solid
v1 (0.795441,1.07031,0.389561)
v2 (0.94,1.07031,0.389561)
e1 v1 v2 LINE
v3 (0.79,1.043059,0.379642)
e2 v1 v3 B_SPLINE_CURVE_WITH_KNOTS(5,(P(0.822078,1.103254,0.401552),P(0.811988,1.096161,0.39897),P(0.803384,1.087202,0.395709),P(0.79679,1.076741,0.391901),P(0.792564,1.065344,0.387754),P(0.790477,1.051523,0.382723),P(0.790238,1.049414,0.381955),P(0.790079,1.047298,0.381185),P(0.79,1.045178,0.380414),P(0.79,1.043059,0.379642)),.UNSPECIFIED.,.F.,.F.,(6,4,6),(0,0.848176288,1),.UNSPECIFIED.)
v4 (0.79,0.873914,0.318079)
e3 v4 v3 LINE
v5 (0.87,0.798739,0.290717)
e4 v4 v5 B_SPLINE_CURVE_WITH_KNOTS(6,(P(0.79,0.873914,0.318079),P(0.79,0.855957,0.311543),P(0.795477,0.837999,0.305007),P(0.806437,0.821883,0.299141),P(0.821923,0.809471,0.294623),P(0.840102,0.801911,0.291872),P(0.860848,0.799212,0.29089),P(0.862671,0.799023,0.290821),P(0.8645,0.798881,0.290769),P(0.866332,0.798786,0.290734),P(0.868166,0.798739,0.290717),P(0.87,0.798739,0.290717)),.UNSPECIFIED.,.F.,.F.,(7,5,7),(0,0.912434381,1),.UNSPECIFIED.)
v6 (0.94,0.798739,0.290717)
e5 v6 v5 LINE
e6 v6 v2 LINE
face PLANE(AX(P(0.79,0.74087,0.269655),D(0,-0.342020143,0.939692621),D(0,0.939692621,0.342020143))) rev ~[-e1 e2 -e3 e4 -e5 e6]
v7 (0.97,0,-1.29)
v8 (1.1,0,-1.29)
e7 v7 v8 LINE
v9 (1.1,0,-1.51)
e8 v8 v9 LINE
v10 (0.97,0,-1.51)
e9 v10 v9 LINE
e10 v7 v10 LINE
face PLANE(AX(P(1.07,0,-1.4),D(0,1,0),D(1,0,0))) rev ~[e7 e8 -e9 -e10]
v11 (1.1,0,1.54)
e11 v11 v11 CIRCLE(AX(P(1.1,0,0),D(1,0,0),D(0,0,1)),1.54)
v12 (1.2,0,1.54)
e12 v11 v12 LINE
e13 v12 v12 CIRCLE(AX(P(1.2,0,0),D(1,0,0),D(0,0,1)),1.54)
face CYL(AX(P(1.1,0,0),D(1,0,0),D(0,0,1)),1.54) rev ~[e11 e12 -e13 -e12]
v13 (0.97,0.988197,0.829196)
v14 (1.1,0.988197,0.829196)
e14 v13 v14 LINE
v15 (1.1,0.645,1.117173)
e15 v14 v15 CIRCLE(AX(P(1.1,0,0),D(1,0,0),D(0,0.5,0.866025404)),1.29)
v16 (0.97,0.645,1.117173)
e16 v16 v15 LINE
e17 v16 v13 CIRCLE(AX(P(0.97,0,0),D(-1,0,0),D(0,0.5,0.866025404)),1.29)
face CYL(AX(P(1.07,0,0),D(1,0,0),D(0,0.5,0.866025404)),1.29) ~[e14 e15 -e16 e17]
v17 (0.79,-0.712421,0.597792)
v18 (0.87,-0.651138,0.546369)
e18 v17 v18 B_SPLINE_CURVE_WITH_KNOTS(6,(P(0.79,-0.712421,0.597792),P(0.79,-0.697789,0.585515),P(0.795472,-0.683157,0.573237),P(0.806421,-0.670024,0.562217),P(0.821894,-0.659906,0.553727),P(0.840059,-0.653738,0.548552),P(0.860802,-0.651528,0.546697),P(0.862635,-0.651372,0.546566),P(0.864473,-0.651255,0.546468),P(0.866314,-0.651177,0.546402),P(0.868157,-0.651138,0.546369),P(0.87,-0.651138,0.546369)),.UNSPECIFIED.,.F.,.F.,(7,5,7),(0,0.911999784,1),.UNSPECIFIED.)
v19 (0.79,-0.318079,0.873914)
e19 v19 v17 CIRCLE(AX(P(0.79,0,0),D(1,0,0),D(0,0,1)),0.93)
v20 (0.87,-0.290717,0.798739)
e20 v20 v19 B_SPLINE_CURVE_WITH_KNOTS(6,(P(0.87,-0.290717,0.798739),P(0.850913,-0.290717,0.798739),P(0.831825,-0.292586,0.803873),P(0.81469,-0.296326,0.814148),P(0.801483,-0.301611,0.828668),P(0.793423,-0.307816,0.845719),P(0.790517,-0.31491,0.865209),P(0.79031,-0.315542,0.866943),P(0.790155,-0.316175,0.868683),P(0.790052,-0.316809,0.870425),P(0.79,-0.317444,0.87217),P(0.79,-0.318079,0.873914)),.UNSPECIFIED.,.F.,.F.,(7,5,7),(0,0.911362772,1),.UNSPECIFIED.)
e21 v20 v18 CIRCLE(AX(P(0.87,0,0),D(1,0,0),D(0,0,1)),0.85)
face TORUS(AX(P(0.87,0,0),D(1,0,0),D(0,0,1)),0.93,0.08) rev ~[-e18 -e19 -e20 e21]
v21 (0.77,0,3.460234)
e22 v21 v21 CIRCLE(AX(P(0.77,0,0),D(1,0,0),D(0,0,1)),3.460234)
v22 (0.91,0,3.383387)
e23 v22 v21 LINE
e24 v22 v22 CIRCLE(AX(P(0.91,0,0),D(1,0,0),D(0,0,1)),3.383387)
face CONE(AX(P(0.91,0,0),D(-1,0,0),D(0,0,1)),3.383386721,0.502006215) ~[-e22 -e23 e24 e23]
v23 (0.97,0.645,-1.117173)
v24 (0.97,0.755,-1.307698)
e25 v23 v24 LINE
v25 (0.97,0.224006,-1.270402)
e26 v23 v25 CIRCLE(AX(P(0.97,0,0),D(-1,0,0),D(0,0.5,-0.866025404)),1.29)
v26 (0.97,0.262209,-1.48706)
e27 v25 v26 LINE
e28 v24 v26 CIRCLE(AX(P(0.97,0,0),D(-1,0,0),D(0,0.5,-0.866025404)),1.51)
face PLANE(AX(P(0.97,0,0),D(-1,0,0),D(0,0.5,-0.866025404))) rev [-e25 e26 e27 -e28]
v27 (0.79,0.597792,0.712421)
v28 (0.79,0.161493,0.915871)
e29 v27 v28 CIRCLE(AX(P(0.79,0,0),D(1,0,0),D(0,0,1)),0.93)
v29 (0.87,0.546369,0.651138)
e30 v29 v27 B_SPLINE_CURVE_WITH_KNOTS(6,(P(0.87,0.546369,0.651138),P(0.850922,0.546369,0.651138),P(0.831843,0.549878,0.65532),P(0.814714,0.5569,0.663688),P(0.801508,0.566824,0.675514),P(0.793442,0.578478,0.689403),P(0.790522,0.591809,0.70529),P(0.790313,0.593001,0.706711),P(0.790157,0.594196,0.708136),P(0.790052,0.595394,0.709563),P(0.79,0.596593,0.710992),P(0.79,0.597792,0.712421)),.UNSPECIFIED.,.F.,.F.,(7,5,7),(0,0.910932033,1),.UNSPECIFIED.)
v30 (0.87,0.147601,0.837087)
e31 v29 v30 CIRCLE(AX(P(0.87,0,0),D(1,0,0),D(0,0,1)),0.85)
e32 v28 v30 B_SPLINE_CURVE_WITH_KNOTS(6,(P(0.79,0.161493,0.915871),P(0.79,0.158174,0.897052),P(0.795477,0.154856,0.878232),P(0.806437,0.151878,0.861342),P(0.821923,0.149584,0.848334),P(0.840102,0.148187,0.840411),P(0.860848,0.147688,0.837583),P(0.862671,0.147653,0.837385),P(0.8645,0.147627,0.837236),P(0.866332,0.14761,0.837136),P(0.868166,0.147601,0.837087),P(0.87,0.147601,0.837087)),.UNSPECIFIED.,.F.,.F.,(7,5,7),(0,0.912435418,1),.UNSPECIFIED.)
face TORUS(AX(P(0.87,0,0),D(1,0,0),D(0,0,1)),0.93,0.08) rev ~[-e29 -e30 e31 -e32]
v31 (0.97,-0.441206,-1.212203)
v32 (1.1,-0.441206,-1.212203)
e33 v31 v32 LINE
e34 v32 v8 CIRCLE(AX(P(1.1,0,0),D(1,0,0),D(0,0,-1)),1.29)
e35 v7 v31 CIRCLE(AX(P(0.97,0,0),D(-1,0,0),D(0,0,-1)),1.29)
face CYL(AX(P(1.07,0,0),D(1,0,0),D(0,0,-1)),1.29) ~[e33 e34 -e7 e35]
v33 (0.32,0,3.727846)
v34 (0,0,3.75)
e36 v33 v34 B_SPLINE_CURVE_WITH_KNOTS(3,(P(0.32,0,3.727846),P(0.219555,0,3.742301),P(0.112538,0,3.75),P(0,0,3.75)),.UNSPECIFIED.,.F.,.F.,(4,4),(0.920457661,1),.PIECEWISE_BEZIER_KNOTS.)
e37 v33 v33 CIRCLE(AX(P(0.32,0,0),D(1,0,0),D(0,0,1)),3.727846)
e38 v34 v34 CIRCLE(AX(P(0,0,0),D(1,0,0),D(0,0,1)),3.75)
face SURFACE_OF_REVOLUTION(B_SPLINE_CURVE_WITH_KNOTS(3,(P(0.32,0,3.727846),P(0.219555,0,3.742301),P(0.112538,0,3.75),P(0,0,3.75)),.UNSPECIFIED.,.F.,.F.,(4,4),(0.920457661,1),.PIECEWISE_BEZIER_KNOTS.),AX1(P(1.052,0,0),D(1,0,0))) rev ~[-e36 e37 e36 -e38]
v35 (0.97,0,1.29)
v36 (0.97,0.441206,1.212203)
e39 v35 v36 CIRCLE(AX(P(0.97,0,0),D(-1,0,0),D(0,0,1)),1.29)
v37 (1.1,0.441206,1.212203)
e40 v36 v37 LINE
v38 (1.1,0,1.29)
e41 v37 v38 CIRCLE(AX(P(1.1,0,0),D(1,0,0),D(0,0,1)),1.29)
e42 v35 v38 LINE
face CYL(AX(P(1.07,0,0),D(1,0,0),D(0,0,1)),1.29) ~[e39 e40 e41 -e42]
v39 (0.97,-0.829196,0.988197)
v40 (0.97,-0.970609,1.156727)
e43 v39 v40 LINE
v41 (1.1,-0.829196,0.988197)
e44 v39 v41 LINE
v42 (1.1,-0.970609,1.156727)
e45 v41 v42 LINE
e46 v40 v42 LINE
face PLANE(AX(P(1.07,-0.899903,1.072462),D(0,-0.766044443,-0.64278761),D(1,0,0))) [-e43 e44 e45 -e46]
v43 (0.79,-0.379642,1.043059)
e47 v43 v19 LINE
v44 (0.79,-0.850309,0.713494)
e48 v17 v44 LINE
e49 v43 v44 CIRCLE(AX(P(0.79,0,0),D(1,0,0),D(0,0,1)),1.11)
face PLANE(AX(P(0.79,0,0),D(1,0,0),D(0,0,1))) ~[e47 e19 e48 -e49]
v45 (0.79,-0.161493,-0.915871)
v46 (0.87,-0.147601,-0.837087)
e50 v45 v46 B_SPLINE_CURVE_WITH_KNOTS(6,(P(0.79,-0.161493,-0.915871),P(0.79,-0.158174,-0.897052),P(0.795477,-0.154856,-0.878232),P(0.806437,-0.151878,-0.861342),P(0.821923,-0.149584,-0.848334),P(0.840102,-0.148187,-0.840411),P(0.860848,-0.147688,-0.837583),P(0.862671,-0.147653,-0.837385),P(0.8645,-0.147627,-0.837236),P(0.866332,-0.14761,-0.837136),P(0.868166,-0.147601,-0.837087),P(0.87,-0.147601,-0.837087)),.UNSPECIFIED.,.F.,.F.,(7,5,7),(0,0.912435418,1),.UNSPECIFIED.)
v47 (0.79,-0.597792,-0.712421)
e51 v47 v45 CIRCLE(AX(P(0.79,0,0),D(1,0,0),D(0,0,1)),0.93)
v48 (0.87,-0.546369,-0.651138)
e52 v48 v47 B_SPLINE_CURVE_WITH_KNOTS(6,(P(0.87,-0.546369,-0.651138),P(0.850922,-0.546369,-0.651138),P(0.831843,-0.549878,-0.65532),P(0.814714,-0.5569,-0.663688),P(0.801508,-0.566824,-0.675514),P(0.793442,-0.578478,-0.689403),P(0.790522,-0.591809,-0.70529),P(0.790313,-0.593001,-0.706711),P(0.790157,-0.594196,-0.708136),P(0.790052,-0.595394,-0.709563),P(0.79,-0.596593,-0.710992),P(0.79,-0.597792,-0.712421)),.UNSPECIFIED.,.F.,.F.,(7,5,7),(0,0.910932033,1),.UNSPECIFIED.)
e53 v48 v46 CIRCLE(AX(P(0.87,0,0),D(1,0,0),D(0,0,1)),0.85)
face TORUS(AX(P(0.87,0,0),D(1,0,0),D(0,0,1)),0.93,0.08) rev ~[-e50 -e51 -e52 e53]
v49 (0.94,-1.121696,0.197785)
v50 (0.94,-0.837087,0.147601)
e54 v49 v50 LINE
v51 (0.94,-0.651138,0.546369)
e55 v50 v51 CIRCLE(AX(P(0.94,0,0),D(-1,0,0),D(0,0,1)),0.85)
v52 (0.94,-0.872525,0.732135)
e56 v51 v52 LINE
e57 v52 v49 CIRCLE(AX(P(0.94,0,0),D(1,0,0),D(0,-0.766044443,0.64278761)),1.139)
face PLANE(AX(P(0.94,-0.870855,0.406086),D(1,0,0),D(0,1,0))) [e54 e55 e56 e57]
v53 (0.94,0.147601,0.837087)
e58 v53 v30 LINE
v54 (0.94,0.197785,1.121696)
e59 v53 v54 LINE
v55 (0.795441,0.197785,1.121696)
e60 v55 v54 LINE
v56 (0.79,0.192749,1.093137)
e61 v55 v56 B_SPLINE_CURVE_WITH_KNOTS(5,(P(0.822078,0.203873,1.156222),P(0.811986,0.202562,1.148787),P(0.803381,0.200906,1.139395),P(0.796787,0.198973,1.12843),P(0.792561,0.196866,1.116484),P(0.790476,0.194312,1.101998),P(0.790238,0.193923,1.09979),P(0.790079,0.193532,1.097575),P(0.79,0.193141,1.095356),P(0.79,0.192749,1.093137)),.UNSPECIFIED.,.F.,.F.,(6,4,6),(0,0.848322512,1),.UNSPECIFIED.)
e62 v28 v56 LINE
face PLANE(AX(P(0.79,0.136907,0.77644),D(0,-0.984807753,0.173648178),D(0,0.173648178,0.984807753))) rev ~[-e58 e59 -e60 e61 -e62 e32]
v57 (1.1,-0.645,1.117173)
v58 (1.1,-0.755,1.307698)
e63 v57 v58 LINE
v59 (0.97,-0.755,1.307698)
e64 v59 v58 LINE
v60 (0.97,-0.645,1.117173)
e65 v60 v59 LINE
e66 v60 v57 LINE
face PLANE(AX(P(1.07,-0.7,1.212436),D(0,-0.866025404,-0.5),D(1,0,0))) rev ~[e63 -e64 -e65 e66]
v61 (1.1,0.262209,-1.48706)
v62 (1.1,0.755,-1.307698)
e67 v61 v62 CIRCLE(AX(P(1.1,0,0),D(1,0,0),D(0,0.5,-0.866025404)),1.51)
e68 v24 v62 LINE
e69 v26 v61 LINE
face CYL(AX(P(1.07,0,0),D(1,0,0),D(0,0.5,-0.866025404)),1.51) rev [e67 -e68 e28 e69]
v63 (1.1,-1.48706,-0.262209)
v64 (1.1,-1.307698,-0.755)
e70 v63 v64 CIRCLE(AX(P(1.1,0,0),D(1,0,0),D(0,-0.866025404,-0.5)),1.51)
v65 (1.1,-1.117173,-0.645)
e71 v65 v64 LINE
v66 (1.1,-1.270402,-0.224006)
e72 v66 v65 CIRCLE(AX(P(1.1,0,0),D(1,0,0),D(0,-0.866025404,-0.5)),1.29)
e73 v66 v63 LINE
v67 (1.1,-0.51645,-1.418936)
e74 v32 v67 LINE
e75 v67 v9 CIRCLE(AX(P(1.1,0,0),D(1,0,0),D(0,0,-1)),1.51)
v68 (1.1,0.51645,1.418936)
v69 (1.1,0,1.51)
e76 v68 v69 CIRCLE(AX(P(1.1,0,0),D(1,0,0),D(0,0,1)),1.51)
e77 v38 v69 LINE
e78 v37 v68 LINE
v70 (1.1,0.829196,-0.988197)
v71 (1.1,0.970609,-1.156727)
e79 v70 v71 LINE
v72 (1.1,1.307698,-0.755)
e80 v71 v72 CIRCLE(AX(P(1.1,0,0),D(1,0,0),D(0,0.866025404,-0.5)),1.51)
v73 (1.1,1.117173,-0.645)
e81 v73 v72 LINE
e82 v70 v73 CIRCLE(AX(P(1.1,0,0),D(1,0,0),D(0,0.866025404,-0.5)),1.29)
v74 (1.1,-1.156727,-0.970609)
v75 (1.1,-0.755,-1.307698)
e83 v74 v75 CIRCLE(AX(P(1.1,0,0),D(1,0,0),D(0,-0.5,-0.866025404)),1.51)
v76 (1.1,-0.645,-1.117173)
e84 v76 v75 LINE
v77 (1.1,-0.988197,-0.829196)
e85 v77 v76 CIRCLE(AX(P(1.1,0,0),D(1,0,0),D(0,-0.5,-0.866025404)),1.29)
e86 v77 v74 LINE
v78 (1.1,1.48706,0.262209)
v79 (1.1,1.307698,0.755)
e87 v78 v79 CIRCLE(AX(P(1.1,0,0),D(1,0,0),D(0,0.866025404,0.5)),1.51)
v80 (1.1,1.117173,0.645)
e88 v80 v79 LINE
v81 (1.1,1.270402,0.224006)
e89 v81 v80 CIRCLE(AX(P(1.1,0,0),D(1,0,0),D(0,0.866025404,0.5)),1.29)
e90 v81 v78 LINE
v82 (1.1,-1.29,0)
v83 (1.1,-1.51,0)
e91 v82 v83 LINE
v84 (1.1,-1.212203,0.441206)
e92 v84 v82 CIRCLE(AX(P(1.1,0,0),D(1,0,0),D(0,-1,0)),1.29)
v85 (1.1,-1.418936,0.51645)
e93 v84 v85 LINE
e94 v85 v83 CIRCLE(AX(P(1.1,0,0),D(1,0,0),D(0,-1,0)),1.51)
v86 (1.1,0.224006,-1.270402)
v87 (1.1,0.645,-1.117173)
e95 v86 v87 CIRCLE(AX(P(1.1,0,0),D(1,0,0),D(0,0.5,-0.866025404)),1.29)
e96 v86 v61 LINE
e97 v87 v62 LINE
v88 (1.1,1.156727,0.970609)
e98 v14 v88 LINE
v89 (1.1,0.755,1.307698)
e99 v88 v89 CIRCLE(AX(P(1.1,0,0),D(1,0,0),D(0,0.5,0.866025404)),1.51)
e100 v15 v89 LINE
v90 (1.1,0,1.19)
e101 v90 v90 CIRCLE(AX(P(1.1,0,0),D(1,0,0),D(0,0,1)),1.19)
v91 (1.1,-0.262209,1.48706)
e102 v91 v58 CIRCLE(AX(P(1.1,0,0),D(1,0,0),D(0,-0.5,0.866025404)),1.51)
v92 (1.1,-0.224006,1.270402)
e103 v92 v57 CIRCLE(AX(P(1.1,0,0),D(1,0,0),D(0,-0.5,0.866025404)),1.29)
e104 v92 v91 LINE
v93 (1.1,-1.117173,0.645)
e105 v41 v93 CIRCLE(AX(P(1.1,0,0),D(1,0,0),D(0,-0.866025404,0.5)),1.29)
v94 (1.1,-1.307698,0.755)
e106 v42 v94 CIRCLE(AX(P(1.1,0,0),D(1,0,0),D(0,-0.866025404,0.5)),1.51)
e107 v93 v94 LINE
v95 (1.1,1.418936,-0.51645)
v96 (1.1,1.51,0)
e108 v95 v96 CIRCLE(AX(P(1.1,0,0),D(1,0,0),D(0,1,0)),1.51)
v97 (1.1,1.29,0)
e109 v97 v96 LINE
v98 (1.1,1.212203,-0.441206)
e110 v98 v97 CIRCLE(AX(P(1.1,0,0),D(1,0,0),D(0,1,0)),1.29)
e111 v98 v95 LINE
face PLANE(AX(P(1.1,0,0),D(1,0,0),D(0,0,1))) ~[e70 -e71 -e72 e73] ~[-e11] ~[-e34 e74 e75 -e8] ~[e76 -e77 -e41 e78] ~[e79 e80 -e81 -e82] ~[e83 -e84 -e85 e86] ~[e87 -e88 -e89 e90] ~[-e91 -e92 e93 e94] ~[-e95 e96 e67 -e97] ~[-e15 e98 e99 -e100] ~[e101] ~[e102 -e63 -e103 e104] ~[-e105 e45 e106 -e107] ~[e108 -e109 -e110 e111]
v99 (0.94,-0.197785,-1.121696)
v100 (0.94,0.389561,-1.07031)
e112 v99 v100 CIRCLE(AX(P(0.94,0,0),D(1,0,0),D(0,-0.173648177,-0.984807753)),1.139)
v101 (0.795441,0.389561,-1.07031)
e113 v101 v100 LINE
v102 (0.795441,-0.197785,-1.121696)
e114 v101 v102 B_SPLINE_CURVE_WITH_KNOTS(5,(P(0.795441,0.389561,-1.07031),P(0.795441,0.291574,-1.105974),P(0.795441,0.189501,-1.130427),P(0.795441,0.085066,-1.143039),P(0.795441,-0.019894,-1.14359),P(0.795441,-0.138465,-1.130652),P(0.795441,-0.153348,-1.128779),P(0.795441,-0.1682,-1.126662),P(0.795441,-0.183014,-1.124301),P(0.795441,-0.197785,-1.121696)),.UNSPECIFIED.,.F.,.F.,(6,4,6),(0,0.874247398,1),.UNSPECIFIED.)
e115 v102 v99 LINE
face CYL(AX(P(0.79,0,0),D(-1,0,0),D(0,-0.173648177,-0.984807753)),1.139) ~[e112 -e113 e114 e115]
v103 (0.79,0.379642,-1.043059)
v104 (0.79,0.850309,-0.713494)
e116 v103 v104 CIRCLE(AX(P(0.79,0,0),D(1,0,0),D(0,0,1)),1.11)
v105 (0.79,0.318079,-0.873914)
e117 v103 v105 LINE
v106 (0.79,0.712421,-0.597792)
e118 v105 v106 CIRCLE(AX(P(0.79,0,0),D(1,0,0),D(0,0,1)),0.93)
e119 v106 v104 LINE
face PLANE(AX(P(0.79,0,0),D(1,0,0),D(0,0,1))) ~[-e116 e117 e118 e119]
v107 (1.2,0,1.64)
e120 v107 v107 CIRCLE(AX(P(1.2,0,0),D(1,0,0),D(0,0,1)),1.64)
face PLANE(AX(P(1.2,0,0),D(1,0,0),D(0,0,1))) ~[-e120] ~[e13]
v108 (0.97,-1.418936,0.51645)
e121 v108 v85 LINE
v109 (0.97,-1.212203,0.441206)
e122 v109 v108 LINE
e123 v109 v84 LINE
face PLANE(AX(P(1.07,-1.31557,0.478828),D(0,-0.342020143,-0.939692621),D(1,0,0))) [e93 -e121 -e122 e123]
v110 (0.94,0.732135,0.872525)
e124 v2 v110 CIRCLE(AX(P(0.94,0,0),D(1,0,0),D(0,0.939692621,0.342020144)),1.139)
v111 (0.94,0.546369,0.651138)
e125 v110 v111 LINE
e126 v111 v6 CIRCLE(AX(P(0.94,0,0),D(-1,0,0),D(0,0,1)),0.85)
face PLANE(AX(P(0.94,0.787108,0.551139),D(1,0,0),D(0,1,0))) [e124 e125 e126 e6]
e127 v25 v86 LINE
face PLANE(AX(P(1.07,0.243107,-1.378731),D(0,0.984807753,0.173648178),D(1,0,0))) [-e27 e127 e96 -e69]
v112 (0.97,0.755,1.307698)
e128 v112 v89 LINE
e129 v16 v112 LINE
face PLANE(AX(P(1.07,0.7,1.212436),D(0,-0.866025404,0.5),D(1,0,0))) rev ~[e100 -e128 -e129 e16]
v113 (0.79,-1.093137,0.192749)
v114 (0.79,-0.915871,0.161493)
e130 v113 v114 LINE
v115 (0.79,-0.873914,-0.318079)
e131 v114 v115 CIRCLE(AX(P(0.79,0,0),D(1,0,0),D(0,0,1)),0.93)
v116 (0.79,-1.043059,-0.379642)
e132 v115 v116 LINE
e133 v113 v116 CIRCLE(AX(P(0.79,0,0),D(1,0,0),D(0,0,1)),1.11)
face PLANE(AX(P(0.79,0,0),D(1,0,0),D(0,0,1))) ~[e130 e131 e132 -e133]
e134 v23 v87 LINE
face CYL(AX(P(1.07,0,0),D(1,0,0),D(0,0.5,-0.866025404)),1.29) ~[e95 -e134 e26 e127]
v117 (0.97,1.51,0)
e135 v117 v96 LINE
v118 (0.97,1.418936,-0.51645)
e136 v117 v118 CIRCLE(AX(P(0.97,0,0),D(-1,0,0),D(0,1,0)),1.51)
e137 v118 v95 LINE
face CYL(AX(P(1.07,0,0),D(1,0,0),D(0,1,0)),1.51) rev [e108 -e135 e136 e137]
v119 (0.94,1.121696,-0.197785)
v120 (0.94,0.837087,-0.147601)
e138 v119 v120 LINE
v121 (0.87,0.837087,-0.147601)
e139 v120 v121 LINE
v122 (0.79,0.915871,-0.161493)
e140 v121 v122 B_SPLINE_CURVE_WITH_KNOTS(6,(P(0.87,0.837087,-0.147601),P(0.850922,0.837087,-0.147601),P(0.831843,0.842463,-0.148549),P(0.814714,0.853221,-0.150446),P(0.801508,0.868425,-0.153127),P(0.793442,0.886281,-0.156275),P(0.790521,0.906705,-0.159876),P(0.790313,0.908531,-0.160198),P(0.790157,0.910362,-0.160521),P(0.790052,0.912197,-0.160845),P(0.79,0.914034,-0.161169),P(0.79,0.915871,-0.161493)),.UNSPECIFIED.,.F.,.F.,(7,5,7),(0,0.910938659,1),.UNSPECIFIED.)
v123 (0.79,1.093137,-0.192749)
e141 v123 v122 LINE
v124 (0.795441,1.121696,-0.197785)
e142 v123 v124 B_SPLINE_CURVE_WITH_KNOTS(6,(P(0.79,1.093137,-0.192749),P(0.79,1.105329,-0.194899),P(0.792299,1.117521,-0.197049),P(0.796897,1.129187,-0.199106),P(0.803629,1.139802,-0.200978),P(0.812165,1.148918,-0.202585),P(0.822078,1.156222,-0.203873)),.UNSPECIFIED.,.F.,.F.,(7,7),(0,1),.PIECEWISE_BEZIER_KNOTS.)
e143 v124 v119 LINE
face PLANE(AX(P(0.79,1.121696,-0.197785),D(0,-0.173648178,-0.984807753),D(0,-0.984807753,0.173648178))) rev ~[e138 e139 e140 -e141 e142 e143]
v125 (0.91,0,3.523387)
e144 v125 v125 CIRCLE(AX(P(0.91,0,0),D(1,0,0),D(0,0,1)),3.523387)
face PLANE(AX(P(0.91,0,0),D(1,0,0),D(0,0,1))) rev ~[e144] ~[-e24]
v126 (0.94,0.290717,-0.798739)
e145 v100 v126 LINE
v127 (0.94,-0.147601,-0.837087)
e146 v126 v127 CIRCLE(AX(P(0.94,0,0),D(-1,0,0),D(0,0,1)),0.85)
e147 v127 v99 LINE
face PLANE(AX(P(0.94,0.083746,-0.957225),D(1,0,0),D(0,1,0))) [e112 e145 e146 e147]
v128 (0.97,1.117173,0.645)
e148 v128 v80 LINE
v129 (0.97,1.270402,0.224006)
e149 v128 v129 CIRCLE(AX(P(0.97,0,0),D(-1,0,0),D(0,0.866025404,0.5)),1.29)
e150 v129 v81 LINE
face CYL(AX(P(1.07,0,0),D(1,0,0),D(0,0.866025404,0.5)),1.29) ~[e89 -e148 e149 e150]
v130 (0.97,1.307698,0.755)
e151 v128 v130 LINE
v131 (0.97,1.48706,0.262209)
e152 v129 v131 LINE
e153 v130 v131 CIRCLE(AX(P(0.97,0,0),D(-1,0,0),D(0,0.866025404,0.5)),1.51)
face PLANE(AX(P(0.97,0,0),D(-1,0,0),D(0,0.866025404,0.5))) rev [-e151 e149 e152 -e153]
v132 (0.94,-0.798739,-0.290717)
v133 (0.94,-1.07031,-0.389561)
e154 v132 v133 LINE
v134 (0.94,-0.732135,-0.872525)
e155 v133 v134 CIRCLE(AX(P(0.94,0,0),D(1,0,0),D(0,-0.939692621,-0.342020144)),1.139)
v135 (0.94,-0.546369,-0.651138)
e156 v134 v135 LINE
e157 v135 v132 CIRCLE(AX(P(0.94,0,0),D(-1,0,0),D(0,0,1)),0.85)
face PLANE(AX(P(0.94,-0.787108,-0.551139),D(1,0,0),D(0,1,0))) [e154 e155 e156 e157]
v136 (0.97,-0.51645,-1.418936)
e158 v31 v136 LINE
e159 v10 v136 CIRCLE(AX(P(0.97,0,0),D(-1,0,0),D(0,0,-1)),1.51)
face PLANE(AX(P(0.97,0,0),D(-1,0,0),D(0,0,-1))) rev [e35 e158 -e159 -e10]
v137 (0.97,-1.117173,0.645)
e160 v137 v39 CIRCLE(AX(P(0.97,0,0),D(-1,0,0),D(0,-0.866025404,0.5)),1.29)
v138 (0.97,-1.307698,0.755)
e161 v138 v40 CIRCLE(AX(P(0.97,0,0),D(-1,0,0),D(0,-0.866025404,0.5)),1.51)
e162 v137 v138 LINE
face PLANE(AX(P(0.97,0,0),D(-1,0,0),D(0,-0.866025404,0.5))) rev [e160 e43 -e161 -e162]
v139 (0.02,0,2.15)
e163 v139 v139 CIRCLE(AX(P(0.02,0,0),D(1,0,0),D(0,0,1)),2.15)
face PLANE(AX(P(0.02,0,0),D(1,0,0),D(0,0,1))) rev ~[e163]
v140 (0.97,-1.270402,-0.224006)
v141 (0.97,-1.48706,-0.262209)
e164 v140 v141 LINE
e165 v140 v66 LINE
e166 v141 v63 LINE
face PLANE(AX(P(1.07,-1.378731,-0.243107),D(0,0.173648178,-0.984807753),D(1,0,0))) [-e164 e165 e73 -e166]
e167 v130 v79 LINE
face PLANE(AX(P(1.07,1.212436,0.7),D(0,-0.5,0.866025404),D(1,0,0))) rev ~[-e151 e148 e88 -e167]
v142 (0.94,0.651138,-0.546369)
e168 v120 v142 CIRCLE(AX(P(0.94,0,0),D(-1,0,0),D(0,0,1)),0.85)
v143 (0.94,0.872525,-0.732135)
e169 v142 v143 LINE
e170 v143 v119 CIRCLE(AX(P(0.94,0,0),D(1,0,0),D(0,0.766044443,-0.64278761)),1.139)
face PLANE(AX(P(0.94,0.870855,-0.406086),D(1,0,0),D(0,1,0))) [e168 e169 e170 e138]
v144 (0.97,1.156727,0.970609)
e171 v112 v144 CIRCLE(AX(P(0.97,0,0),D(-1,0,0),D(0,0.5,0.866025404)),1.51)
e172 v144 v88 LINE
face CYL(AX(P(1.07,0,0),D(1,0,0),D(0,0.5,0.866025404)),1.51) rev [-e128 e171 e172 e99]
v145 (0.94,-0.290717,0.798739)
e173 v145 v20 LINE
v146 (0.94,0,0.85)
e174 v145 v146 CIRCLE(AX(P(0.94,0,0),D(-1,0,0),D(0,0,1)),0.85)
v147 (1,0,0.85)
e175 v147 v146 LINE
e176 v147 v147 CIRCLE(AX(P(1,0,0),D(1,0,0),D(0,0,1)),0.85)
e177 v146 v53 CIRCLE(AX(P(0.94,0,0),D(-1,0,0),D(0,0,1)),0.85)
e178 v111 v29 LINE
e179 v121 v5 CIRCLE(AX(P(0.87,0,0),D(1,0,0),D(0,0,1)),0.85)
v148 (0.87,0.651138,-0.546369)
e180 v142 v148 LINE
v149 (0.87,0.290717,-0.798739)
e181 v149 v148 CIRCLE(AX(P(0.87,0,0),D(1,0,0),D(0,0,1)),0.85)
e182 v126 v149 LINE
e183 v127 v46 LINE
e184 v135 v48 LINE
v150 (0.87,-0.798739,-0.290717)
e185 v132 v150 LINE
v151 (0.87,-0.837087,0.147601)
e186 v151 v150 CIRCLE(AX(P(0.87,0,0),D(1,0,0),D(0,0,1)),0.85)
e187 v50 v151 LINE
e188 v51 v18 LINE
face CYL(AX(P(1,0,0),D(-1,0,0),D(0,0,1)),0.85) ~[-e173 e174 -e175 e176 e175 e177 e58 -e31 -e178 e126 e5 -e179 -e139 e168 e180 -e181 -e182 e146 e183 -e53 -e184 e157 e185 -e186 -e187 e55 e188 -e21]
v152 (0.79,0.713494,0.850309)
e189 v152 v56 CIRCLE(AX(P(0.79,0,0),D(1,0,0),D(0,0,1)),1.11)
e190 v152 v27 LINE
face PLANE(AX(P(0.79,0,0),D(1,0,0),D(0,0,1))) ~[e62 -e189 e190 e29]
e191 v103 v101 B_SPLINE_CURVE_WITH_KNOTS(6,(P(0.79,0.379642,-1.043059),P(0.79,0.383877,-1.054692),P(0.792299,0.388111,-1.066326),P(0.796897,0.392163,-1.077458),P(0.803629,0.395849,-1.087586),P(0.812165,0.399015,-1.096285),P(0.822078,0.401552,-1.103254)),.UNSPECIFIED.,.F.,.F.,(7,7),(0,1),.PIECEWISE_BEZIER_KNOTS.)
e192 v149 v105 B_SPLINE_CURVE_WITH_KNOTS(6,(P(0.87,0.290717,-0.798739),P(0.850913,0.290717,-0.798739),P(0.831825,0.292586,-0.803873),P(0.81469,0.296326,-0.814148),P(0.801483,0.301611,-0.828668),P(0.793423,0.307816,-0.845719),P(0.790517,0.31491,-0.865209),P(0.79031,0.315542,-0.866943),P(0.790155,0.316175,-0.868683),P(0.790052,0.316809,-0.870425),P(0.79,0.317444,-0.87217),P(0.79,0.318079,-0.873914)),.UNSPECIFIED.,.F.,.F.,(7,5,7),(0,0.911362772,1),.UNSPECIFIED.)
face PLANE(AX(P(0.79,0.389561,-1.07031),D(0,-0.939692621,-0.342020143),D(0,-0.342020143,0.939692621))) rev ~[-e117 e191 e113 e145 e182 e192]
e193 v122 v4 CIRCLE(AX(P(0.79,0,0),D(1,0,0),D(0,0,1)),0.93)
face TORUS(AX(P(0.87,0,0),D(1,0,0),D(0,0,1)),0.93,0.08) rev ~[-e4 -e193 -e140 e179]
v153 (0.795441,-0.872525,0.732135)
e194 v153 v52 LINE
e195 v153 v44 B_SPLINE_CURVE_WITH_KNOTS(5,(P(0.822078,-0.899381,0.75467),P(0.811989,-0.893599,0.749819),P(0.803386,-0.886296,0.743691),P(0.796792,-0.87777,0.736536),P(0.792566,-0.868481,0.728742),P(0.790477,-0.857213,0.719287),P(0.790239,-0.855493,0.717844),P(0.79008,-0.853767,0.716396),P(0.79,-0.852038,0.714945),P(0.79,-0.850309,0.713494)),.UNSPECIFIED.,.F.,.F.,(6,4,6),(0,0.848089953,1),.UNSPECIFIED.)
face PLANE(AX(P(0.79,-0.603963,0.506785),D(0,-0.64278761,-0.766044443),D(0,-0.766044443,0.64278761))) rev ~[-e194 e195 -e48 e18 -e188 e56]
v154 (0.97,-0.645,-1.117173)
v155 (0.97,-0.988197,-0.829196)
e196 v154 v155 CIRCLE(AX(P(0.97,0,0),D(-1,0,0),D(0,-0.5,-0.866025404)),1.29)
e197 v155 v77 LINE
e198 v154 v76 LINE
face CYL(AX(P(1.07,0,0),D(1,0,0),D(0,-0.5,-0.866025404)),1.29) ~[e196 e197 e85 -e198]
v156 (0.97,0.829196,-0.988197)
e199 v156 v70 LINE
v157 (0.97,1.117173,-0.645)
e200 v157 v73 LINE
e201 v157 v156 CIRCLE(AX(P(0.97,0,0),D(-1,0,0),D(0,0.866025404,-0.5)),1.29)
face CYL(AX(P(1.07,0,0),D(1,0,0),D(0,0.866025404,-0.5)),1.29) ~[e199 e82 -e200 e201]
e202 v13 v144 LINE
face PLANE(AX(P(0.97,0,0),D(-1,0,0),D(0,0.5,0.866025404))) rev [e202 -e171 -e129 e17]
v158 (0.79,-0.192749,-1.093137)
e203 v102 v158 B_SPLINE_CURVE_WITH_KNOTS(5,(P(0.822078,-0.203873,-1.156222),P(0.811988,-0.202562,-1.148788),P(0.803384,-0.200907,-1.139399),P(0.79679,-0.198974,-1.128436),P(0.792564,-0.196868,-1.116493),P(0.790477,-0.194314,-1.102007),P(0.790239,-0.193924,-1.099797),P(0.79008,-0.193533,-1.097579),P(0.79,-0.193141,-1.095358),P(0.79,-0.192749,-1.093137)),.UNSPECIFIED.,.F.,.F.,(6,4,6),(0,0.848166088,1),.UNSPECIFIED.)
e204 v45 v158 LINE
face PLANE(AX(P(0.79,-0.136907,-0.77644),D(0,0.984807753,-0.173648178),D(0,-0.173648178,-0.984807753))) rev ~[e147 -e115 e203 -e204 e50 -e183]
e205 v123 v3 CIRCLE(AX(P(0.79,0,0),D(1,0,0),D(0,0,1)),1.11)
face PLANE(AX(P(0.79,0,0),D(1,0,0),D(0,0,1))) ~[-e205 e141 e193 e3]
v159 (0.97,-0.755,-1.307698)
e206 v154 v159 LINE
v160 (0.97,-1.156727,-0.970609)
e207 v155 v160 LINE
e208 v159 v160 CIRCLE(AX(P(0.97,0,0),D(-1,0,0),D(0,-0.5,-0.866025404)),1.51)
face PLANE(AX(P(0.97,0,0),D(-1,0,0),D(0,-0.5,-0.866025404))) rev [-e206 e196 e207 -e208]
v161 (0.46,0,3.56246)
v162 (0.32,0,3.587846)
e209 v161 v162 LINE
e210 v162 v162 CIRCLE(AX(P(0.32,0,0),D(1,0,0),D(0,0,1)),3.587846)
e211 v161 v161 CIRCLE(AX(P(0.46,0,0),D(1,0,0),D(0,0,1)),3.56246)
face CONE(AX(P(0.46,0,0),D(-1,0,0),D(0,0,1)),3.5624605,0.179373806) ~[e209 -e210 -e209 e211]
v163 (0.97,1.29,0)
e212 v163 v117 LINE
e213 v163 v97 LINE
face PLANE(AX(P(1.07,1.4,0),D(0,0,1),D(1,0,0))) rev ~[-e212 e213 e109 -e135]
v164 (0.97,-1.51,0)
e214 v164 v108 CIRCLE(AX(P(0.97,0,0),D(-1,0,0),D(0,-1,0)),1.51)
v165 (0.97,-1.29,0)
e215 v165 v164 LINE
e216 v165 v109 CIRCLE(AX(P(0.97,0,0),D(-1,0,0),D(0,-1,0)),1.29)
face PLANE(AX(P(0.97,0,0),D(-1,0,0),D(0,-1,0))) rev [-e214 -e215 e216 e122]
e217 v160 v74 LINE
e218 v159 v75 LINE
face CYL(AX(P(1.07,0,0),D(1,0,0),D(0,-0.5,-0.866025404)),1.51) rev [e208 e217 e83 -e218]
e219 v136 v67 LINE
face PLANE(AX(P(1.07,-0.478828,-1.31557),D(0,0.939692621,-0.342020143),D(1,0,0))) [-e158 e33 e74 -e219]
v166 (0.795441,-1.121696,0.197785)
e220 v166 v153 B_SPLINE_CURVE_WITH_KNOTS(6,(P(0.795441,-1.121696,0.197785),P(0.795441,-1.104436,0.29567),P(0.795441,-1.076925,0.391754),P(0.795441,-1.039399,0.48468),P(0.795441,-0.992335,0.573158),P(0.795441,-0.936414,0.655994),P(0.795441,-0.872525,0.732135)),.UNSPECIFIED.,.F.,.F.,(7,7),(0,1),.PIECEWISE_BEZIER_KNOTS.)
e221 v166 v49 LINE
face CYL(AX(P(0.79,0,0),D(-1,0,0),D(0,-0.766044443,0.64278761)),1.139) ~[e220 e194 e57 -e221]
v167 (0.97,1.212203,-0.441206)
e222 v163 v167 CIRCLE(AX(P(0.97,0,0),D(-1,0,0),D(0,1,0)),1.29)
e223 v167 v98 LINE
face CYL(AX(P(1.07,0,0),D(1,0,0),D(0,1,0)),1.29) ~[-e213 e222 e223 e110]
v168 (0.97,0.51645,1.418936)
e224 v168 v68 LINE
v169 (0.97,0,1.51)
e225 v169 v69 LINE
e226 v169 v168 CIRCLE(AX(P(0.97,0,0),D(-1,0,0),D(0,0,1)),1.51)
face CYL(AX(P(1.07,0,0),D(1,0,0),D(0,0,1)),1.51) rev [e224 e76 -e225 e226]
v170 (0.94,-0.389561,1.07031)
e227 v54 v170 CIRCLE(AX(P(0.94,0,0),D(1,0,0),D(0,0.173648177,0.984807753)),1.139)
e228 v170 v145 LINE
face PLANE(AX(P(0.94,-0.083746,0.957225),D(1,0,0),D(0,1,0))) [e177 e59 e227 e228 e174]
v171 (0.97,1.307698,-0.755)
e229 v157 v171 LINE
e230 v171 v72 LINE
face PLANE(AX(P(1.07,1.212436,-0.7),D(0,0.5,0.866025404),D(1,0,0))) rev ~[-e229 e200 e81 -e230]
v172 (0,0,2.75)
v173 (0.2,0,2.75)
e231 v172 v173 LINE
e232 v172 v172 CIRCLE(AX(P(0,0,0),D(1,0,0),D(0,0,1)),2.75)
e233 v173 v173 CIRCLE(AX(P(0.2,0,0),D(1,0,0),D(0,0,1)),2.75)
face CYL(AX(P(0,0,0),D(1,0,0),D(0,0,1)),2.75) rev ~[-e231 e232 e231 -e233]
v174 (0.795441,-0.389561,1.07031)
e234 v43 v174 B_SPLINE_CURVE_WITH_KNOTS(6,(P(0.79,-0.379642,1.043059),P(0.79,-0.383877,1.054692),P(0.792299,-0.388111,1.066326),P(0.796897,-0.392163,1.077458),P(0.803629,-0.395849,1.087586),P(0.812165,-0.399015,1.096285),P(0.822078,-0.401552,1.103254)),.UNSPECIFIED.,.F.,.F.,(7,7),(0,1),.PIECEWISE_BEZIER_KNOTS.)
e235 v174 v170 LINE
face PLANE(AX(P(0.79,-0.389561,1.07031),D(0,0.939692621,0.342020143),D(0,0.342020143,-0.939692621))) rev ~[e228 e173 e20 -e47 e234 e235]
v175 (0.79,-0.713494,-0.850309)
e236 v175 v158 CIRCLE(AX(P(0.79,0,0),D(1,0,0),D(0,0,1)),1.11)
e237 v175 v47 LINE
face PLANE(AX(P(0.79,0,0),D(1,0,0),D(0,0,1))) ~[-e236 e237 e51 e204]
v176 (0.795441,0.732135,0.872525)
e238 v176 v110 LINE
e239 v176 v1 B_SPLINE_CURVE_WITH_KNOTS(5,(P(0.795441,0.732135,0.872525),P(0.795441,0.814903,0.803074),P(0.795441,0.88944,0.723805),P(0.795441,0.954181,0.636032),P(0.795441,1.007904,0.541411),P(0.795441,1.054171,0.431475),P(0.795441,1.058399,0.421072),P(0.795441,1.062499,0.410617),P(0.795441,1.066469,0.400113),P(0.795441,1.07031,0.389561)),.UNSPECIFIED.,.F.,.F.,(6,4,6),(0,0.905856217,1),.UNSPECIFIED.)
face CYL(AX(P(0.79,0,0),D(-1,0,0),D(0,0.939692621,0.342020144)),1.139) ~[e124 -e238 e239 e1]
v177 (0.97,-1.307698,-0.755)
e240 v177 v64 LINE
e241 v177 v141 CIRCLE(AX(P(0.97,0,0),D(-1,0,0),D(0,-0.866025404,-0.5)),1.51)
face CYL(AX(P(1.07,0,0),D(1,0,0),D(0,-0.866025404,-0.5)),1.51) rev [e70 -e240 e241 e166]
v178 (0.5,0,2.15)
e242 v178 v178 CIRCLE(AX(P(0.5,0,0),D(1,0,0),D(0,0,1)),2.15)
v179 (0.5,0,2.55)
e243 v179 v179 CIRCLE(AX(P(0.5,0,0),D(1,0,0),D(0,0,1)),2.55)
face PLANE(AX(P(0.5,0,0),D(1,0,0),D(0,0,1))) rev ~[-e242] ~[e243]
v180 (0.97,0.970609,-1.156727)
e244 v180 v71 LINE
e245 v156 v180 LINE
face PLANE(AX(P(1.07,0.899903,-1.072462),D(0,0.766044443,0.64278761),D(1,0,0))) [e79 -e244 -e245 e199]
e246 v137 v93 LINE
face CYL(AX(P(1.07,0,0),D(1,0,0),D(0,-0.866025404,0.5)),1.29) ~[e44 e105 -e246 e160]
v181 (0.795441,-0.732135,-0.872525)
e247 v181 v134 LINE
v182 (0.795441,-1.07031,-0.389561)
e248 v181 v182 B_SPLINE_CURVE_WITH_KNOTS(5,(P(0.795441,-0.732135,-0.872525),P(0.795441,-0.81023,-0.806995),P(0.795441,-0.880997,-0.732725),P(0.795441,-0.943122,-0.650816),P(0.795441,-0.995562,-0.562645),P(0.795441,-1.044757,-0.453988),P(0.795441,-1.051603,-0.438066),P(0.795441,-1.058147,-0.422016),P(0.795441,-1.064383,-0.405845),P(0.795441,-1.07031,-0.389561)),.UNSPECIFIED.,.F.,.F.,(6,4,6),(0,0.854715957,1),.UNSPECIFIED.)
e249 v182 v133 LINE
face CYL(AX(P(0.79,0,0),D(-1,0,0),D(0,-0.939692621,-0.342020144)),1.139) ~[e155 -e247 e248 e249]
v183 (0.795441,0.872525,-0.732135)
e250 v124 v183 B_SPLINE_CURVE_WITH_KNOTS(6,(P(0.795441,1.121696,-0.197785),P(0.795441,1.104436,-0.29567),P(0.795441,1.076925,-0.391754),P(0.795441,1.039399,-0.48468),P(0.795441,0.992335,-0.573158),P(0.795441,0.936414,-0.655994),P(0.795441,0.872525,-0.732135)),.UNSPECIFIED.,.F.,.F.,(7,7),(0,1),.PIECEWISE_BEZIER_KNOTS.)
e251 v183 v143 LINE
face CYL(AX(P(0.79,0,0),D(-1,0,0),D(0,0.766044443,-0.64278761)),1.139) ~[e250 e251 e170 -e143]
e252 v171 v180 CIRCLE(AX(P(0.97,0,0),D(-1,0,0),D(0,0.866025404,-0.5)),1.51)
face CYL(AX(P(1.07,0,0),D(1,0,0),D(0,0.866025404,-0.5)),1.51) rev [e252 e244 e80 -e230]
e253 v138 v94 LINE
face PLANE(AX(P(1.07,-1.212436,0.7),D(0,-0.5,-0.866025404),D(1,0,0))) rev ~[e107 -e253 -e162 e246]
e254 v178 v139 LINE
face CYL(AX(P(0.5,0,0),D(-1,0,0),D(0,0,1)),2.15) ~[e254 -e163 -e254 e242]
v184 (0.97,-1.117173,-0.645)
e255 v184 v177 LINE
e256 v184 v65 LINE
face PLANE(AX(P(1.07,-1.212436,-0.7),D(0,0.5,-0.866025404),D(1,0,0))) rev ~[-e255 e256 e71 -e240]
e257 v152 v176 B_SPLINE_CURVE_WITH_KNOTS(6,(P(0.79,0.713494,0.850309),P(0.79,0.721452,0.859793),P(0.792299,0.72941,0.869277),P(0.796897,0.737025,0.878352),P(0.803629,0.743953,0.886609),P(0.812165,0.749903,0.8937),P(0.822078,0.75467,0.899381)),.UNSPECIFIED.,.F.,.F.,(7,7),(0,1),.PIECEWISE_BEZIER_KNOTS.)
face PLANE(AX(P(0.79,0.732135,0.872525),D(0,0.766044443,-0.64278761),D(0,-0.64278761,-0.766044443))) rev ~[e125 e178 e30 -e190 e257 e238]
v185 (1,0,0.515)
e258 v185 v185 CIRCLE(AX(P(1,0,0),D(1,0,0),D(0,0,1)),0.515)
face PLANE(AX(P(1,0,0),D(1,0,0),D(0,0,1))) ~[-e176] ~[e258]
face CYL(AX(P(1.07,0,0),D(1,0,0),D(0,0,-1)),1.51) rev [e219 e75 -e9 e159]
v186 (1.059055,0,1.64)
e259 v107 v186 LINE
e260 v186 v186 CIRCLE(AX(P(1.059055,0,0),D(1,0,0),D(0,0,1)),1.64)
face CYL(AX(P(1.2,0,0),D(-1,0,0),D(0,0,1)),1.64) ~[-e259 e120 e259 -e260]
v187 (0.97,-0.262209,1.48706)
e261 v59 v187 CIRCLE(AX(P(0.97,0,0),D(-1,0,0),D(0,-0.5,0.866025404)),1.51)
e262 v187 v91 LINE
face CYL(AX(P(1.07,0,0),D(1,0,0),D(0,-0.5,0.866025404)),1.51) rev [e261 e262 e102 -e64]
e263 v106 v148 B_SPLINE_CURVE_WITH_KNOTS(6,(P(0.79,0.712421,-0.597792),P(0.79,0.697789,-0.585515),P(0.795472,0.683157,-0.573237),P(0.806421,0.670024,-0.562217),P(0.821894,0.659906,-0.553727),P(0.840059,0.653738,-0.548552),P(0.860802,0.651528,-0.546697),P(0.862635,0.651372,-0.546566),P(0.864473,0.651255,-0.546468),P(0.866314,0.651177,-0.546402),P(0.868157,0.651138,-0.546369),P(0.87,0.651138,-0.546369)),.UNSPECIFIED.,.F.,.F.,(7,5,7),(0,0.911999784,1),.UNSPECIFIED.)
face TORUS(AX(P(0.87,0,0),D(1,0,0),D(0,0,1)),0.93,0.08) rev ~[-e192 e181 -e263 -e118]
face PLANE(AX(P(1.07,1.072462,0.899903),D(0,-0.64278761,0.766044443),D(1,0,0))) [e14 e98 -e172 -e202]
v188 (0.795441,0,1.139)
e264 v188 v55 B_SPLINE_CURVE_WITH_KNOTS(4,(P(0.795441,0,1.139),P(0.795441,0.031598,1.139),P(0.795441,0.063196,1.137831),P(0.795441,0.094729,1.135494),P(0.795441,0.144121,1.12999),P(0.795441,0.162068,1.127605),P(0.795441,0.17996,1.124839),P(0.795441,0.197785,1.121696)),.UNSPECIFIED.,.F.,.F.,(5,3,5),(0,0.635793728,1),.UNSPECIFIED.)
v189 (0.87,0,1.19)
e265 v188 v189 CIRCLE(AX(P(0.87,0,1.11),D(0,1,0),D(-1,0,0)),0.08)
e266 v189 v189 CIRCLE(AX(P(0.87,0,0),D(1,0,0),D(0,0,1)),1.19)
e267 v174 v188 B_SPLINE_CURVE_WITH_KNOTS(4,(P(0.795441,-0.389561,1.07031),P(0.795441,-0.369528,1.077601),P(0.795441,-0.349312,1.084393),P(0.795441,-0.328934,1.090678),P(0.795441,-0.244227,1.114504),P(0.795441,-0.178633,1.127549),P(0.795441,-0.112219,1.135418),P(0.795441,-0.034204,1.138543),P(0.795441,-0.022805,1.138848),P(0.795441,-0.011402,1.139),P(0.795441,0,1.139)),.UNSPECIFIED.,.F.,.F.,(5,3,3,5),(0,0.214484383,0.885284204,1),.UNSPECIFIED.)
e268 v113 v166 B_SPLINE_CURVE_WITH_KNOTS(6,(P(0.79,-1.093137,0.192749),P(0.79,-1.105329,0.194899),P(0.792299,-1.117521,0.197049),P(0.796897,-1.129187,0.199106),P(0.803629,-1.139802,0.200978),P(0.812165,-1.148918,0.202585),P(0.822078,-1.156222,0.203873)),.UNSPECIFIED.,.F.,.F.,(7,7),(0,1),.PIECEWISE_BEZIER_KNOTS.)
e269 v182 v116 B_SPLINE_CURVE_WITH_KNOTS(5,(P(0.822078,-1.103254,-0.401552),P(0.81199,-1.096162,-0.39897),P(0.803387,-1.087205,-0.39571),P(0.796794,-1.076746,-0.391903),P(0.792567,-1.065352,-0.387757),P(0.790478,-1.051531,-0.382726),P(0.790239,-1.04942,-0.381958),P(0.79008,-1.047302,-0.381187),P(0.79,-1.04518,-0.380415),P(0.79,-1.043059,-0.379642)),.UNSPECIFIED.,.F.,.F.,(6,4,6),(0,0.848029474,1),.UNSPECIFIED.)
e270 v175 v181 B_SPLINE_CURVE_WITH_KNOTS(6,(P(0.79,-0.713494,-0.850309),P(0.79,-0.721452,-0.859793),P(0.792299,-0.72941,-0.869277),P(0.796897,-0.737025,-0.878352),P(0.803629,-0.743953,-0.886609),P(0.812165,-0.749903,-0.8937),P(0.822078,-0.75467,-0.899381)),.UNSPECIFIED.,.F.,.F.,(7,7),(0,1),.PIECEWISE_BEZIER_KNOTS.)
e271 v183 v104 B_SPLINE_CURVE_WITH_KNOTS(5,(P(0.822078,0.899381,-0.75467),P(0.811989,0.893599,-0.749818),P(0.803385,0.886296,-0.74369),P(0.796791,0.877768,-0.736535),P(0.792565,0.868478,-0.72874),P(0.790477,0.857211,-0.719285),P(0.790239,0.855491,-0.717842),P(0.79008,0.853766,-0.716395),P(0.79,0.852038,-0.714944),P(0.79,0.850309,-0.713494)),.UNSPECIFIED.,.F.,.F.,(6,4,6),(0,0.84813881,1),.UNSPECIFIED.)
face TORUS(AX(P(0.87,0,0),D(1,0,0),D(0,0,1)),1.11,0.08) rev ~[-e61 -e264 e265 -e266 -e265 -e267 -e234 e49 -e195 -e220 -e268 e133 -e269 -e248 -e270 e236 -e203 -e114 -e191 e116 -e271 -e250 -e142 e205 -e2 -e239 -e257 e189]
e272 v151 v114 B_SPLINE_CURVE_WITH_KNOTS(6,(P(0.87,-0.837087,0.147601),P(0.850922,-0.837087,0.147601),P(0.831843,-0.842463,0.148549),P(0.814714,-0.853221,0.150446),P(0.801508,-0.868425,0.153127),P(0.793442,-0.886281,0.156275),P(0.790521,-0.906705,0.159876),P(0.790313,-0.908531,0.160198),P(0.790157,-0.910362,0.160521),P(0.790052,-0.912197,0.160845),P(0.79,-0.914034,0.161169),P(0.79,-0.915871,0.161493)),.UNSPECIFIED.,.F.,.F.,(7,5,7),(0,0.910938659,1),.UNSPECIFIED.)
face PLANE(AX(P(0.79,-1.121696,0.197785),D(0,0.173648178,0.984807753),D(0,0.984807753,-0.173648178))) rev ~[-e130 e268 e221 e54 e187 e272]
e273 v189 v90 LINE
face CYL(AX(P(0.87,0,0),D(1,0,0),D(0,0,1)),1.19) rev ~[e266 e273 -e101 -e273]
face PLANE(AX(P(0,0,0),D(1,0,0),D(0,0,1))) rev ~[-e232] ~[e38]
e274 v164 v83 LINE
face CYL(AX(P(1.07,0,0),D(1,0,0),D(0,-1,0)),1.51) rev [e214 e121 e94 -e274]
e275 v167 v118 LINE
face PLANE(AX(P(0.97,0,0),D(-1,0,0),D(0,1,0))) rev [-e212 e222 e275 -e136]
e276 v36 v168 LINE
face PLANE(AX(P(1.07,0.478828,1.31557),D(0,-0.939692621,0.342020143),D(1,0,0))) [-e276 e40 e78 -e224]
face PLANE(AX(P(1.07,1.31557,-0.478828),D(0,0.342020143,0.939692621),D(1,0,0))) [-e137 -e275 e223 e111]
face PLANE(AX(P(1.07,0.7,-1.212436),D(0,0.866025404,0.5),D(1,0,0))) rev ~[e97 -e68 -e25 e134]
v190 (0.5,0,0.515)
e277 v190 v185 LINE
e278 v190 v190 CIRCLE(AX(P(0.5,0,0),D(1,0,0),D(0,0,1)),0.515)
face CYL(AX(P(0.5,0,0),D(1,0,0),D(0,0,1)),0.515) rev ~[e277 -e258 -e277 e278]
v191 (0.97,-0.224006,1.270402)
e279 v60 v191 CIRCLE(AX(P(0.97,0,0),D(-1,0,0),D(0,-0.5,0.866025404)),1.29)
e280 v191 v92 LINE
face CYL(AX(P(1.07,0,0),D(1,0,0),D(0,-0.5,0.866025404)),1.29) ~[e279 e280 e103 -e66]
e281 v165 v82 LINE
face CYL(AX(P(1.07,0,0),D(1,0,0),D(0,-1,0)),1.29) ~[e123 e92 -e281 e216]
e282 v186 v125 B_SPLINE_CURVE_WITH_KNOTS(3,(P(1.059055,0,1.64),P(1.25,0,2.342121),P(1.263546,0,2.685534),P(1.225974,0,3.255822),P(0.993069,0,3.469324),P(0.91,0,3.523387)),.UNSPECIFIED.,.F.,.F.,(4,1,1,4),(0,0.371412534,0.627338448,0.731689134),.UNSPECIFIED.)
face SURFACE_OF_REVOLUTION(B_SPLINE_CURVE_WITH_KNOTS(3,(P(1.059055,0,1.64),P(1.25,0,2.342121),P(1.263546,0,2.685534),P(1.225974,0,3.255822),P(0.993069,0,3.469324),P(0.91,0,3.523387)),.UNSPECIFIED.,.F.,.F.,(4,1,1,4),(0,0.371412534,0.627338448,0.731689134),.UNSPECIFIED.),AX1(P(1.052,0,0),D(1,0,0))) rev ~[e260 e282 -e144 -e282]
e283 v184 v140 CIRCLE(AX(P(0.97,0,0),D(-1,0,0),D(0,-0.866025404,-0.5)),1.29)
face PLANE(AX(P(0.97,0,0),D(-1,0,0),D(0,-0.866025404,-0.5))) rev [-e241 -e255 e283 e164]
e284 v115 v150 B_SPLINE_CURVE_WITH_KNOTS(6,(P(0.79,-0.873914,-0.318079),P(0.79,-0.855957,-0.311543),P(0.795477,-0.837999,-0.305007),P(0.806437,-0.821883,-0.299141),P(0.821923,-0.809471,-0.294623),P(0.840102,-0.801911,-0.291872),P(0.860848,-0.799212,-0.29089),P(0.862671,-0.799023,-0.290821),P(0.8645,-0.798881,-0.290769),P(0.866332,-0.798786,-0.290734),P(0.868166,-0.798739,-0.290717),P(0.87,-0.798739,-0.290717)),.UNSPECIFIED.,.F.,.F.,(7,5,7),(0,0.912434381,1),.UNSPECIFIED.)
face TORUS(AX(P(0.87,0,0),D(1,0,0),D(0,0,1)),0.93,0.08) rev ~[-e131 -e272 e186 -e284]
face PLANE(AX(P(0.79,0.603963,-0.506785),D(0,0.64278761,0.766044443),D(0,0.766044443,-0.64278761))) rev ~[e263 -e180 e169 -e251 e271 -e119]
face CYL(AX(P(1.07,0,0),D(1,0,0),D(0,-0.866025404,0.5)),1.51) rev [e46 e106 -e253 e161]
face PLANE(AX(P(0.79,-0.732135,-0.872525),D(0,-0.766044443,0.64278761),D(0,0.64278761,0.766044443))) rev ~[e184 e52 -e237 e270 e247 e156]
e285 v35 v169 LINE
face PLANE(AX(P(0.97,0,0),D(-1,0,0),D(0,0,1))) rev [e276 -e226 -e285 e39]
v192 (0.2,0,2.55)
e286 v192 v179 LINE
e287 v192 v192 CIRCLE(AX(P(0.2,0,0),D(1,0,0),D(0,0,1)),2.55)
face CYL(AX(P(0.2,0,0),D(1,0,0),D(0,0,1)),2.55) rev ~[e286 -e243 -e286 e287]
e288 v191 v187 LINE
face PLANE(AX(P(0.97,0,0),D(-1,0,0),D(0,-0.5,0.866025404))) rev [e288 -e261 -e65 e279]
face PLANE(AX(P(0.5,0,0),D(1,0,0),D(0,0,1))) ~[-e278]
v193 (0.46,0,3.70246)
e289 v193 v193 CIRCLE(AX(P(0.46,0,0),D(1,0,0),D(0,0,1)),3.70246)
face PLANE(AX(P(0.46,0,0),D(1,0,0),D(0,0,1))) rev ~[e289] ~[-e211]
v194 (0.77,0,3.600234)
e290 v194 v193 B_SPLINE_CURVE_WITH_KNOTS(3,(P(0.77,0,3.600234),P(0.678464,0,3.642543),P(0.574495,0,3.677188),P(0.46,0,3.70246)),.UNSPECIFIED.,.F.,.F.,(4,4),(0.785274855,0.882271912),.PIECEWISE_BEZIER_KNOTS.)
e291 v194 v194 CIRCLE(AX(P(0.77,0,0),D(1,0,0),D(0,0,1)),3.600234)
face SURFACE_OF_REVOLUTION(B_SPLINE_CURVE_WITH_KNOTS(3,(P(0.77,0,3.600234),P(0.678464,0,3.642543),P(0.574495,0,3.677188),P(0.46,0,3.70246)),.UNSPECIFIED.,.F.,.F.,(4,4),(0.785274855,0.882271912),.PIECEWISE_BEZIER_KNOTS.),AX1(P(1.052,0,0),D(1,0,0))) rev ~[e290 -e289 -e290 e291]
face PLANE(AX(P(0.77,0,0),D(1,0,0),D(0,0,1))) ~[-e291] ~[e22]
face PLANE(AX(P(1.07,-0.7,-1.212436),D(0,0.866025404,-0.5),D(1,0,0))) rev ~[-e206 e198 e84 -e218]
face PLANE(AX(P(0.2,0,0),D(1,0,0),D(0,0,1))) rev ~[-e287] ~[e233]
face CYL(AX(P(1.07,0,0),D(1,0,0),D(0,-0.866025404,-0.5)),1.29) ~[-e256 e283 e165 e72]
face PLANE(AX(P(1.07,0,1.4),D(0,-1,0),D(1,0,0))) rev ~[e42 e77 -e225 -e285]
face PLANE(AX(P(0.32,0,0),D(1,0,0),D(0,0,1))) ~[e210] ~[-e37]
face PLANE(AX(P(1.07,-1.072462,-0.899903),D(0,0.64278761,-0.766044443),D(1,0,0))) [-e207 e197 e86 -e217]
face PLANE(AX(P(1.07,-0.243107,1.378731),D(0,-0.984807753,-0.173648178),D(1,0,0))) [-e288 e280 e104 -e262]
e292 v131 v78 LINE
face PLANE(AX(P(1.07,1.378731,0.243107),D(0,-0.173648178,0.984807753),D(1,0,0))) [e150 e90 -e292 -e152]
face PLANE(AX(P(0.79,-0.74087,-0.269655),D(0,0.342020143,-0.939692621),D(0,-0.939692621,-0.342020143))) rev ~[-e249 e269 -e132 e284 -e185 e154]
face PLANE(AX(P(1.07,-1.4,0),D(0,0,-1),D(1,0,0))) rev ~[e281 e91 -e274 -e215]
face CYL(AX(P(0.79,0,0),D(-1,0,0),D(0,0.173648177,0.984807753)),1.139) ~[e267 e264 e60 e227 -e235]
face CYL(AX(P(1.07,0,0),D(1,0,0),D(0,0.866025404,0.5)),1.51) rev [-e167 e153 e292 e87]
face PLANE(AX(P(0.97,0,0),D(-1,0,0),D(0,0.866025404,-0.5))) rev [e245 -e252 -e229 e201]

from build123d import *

# Parameters (mm, degrees)
F2_W            = 0.2
F2_H            = 0.22
F3_ANGLE        = 20
F3_COPIES_COUNT = 12
F5_DEPTH        = 0.15


# Not quite as in the source:
# - a pattern or mirror of a feature is missing from the dataset's text; its kind, count and spacing are read off the source's solid


with BuildPart() as f1:
    # F0 (on Front) → F1 (revolve)
    with BuildSketch(Plane.XZ):
        with BuildLine():
            Line((1, 0.85), (0.87, 0.85))
            ThreePointArc((0.87, 0.85), (0.8134314575, 0.8734314575), (0.79, 0.93))
            Line((0.79, 0.93), (0.79, 1.11))
            ThreePointArc((0.79, 1.11), (0.8134314575, 1.1665685425), (0.87, 1.19))
            Line((0.87, 1.19), (1.1, 1.19))
            Line((1.1, 1.19), (1.1, 1.54))
            Line((1.1, 1.54), (1.2, 1.54))
            Line((1.2, 1.54), (1.2, 1.64))
            Line((1.2, 1.64), (1.12, 1.64))
            Line((1.12, 1.64), (1.0590550792, 1.64))
            add(Edge.make_bspline(
                [(1.0590550792, 1.64), (1.25, 2.3421209771), (1.2635455001, 2.685534462), (1.2259744013, 3.2558219262), (0.9930693577, 3.4693235058), (0.91, 3.5233867214)],
                knots=[0, 0, 0, 0, 0.3714125336, 0.6273384476, 0.7316891336, 0.7316891336, 0.7316891336, 0.7316891336], degree=3))
            Line((0.91, 3.5233867214), (0.91, 3.3833867214))
            Line((0.91, 3.3833867214), (0.77, 3.4602341654))
            Line((0.77, 3.4602341654), (0.77, 3.6002341654))
            add(Edge.make_bspline(
                [(0.77, 3.6002341654), (0.6784642229, 3.6425426702), (0.5744947558, 3.6771881754), (0.46, 3.7024604996)],
                knots=[0.7852748547, 0.7852748547, 0.7852748547, 0.7852748547, 0.8822719118, 0.8822719118, 0.8822719118, 0.8822719118], degree=3))
            Line((0.46, 3.7024604996), (0.46, 3.5624604996))
            Line((0.46, 3.5624604996), (0.32, 3.5878456739))
            Line((0.32, 3.5878456739), (0.32, 3.7278456739))
            add(Edge.make_bspline(
                [(0.32, 3.7278456739), (0.2195553432, 3.7423008552), (0.1125378698, 3.75), (0, 3.75)],
                knots=[0.9204576606, 0.9204576606, 0.9204576606, 0.9204576606, 1, 1, 1, 1], degree=3))
            Line((0, 3.75), (0, 2.75))
            Line((0, 2.75), (0.2, 2.75))
            Line((0.2, 2.75), (0.2, 2.55))
            Line((0.2, 2.55), (0.5, 2.55))
            Line((0.5, 2.55), (0.5, 2.15))
            Line((0.5, 2.15), (0.02, 2.15))
            Line((0.02, 2.15), (0.02, 0))
            Line((0.02, 0), (0.5, 0))
            Line((0.5, 0), (0.5, 0.515))
            Line((0.5, 0.515), (1, 0.515))
            Line((1, 0.515), (1, 0.85))
        make_face()
    revolve(axis=Axis((1.052, 0, 0), (1, 0, 0)))

    # F2 (on Front) → F3 (revolve, cut)
    with BuildSketch(Plane.XZ):
        with Locations((1.07, 1.4)):
            Rectangle(F2_W, F2_H)
    f3 = revolve(axis=Axis((1.36, 0, 0), (-1, 0, 0)), revolution_arc=F3_ANGLE, mode=Mode.SUBTRACT)

    # F3_copies: F3 ×12 about axis
    f3_copies_axis = Axis((0, 0, 0), (1, 0, 0))
    for i in range(1, F3_COPIES_COUNT):
        add(f3.rotate(f3_copies_axis, i * 360 / F3_COPIES_COUNT), mode=Mode.SUBTRACT)

    # F4 (on face) → F5 (join)
    with BuildSketch(Plane.YZ.offset(0.79)):
        with BuildLine():
            Line((-0.3895609432, 1.0703098951), (-0.2696546218, 0.7408699845))
            ThreePointArc((-0.2696546218, 0.7408699845), (-0.0687151015, 0.7854172037), (0.1369072395, 0.7764395384))
            Line((0.1369072395, 0.7764395384), (0.1977852744, 1.1216960307))
            ThreePointArc((0.1977852744, 1.1216960307), (-0.099270391, 1.1346657611), (-0.3895609432, 1.0703098951))
        make_face()
        with BuildLine():
            Line((-1.1216960307, 0.1977852744), (-0.7764395384, 0.1369072395))
            ThreePointArc((-0.7764395384, 0.1369072395), (-0.7145488017, 0.3331995784), (-0.603962745, 0.5067849166))
            Line((-0.603962745, 0.5067849166), (-0.8725246207, 0.7321350874))
            ThreePointArc((-0.8725246207, 0.7321350874), (-1.0322845694, 0.4813622001), (-1.1216960307, 0.1977852744))
        make_face()
        with BuildLine():
            Line((-0.7321350874, -0.8725246207), (-0.5067849166, -0.603962745))
            ThreePointArc((-0.5067849166, -0.603962745), (-0.6458337002, -0.4522176253), (-0.7408699845, -0.2696546218))
            Line((-0.7408699845, -0.2696546218), (-1.0703098951, -0.3895609432))
            ThreePointArc((-1.0703098951, -0.3895609432), (-0.9330141784, -0.653303561), (-0.7321350874, -0.8725246207))
        make_face()
        with BuildLine():
            Line((0.3895609432, -1.0703098951), (0.2696546218, -0.7408699845))
            ThreePointArc((0.2696546218, -0.7408699845), (0.0687151015, -0.7854172037), (-0.1369072395, -0.7764395384))
            Line((-0.1369072395, -0.7764395384), (-0.1977852744, -1.1216960307))
            ThreePointArc((-0.1977852744, -1.1216960307), (0.099270391, -1.1346657611), (0.3895609432, -1.0703098951))
        make_face()
        with BuildLine():
            Line((1.1216960307, -0.1977852744), (0.7764395384, -0.1369072395))
            ThreePointArc((0.7764395384, -0.1369072395), (0.7145488017, -0.3331995784), (0.603962745, -0.5067849166))
            Line((0.603962745, -0.5067849166), (0.8725246207, -0.7321350874))
            ThreePointArc((0.8725246207, -0.7321350874), (1.0322845694, -0.4813622001), (1.1216960307, -0.1977852744))
        make_face()
        with BuildLine():
            Line((0.7321350874, 0.8725246207), (0.5067849166, 0.603962745))
            ThreePointArc((0.5067849166, 0.603962745), (0.6458337002, 0.4522176253), (0.7408699845, 0.2696546218))
            Line((0.7408699845, 0.2696546218), (1.0703098951, 0.3895609432))
            ThreePointArc((1.0703098951, 0.3895609432), (0.9330141784, 0.653303561), (0.7321350874, 0.8725246207))
        make_face()
    extrude(amount=F5_DEPTH)


solid = f1.part
